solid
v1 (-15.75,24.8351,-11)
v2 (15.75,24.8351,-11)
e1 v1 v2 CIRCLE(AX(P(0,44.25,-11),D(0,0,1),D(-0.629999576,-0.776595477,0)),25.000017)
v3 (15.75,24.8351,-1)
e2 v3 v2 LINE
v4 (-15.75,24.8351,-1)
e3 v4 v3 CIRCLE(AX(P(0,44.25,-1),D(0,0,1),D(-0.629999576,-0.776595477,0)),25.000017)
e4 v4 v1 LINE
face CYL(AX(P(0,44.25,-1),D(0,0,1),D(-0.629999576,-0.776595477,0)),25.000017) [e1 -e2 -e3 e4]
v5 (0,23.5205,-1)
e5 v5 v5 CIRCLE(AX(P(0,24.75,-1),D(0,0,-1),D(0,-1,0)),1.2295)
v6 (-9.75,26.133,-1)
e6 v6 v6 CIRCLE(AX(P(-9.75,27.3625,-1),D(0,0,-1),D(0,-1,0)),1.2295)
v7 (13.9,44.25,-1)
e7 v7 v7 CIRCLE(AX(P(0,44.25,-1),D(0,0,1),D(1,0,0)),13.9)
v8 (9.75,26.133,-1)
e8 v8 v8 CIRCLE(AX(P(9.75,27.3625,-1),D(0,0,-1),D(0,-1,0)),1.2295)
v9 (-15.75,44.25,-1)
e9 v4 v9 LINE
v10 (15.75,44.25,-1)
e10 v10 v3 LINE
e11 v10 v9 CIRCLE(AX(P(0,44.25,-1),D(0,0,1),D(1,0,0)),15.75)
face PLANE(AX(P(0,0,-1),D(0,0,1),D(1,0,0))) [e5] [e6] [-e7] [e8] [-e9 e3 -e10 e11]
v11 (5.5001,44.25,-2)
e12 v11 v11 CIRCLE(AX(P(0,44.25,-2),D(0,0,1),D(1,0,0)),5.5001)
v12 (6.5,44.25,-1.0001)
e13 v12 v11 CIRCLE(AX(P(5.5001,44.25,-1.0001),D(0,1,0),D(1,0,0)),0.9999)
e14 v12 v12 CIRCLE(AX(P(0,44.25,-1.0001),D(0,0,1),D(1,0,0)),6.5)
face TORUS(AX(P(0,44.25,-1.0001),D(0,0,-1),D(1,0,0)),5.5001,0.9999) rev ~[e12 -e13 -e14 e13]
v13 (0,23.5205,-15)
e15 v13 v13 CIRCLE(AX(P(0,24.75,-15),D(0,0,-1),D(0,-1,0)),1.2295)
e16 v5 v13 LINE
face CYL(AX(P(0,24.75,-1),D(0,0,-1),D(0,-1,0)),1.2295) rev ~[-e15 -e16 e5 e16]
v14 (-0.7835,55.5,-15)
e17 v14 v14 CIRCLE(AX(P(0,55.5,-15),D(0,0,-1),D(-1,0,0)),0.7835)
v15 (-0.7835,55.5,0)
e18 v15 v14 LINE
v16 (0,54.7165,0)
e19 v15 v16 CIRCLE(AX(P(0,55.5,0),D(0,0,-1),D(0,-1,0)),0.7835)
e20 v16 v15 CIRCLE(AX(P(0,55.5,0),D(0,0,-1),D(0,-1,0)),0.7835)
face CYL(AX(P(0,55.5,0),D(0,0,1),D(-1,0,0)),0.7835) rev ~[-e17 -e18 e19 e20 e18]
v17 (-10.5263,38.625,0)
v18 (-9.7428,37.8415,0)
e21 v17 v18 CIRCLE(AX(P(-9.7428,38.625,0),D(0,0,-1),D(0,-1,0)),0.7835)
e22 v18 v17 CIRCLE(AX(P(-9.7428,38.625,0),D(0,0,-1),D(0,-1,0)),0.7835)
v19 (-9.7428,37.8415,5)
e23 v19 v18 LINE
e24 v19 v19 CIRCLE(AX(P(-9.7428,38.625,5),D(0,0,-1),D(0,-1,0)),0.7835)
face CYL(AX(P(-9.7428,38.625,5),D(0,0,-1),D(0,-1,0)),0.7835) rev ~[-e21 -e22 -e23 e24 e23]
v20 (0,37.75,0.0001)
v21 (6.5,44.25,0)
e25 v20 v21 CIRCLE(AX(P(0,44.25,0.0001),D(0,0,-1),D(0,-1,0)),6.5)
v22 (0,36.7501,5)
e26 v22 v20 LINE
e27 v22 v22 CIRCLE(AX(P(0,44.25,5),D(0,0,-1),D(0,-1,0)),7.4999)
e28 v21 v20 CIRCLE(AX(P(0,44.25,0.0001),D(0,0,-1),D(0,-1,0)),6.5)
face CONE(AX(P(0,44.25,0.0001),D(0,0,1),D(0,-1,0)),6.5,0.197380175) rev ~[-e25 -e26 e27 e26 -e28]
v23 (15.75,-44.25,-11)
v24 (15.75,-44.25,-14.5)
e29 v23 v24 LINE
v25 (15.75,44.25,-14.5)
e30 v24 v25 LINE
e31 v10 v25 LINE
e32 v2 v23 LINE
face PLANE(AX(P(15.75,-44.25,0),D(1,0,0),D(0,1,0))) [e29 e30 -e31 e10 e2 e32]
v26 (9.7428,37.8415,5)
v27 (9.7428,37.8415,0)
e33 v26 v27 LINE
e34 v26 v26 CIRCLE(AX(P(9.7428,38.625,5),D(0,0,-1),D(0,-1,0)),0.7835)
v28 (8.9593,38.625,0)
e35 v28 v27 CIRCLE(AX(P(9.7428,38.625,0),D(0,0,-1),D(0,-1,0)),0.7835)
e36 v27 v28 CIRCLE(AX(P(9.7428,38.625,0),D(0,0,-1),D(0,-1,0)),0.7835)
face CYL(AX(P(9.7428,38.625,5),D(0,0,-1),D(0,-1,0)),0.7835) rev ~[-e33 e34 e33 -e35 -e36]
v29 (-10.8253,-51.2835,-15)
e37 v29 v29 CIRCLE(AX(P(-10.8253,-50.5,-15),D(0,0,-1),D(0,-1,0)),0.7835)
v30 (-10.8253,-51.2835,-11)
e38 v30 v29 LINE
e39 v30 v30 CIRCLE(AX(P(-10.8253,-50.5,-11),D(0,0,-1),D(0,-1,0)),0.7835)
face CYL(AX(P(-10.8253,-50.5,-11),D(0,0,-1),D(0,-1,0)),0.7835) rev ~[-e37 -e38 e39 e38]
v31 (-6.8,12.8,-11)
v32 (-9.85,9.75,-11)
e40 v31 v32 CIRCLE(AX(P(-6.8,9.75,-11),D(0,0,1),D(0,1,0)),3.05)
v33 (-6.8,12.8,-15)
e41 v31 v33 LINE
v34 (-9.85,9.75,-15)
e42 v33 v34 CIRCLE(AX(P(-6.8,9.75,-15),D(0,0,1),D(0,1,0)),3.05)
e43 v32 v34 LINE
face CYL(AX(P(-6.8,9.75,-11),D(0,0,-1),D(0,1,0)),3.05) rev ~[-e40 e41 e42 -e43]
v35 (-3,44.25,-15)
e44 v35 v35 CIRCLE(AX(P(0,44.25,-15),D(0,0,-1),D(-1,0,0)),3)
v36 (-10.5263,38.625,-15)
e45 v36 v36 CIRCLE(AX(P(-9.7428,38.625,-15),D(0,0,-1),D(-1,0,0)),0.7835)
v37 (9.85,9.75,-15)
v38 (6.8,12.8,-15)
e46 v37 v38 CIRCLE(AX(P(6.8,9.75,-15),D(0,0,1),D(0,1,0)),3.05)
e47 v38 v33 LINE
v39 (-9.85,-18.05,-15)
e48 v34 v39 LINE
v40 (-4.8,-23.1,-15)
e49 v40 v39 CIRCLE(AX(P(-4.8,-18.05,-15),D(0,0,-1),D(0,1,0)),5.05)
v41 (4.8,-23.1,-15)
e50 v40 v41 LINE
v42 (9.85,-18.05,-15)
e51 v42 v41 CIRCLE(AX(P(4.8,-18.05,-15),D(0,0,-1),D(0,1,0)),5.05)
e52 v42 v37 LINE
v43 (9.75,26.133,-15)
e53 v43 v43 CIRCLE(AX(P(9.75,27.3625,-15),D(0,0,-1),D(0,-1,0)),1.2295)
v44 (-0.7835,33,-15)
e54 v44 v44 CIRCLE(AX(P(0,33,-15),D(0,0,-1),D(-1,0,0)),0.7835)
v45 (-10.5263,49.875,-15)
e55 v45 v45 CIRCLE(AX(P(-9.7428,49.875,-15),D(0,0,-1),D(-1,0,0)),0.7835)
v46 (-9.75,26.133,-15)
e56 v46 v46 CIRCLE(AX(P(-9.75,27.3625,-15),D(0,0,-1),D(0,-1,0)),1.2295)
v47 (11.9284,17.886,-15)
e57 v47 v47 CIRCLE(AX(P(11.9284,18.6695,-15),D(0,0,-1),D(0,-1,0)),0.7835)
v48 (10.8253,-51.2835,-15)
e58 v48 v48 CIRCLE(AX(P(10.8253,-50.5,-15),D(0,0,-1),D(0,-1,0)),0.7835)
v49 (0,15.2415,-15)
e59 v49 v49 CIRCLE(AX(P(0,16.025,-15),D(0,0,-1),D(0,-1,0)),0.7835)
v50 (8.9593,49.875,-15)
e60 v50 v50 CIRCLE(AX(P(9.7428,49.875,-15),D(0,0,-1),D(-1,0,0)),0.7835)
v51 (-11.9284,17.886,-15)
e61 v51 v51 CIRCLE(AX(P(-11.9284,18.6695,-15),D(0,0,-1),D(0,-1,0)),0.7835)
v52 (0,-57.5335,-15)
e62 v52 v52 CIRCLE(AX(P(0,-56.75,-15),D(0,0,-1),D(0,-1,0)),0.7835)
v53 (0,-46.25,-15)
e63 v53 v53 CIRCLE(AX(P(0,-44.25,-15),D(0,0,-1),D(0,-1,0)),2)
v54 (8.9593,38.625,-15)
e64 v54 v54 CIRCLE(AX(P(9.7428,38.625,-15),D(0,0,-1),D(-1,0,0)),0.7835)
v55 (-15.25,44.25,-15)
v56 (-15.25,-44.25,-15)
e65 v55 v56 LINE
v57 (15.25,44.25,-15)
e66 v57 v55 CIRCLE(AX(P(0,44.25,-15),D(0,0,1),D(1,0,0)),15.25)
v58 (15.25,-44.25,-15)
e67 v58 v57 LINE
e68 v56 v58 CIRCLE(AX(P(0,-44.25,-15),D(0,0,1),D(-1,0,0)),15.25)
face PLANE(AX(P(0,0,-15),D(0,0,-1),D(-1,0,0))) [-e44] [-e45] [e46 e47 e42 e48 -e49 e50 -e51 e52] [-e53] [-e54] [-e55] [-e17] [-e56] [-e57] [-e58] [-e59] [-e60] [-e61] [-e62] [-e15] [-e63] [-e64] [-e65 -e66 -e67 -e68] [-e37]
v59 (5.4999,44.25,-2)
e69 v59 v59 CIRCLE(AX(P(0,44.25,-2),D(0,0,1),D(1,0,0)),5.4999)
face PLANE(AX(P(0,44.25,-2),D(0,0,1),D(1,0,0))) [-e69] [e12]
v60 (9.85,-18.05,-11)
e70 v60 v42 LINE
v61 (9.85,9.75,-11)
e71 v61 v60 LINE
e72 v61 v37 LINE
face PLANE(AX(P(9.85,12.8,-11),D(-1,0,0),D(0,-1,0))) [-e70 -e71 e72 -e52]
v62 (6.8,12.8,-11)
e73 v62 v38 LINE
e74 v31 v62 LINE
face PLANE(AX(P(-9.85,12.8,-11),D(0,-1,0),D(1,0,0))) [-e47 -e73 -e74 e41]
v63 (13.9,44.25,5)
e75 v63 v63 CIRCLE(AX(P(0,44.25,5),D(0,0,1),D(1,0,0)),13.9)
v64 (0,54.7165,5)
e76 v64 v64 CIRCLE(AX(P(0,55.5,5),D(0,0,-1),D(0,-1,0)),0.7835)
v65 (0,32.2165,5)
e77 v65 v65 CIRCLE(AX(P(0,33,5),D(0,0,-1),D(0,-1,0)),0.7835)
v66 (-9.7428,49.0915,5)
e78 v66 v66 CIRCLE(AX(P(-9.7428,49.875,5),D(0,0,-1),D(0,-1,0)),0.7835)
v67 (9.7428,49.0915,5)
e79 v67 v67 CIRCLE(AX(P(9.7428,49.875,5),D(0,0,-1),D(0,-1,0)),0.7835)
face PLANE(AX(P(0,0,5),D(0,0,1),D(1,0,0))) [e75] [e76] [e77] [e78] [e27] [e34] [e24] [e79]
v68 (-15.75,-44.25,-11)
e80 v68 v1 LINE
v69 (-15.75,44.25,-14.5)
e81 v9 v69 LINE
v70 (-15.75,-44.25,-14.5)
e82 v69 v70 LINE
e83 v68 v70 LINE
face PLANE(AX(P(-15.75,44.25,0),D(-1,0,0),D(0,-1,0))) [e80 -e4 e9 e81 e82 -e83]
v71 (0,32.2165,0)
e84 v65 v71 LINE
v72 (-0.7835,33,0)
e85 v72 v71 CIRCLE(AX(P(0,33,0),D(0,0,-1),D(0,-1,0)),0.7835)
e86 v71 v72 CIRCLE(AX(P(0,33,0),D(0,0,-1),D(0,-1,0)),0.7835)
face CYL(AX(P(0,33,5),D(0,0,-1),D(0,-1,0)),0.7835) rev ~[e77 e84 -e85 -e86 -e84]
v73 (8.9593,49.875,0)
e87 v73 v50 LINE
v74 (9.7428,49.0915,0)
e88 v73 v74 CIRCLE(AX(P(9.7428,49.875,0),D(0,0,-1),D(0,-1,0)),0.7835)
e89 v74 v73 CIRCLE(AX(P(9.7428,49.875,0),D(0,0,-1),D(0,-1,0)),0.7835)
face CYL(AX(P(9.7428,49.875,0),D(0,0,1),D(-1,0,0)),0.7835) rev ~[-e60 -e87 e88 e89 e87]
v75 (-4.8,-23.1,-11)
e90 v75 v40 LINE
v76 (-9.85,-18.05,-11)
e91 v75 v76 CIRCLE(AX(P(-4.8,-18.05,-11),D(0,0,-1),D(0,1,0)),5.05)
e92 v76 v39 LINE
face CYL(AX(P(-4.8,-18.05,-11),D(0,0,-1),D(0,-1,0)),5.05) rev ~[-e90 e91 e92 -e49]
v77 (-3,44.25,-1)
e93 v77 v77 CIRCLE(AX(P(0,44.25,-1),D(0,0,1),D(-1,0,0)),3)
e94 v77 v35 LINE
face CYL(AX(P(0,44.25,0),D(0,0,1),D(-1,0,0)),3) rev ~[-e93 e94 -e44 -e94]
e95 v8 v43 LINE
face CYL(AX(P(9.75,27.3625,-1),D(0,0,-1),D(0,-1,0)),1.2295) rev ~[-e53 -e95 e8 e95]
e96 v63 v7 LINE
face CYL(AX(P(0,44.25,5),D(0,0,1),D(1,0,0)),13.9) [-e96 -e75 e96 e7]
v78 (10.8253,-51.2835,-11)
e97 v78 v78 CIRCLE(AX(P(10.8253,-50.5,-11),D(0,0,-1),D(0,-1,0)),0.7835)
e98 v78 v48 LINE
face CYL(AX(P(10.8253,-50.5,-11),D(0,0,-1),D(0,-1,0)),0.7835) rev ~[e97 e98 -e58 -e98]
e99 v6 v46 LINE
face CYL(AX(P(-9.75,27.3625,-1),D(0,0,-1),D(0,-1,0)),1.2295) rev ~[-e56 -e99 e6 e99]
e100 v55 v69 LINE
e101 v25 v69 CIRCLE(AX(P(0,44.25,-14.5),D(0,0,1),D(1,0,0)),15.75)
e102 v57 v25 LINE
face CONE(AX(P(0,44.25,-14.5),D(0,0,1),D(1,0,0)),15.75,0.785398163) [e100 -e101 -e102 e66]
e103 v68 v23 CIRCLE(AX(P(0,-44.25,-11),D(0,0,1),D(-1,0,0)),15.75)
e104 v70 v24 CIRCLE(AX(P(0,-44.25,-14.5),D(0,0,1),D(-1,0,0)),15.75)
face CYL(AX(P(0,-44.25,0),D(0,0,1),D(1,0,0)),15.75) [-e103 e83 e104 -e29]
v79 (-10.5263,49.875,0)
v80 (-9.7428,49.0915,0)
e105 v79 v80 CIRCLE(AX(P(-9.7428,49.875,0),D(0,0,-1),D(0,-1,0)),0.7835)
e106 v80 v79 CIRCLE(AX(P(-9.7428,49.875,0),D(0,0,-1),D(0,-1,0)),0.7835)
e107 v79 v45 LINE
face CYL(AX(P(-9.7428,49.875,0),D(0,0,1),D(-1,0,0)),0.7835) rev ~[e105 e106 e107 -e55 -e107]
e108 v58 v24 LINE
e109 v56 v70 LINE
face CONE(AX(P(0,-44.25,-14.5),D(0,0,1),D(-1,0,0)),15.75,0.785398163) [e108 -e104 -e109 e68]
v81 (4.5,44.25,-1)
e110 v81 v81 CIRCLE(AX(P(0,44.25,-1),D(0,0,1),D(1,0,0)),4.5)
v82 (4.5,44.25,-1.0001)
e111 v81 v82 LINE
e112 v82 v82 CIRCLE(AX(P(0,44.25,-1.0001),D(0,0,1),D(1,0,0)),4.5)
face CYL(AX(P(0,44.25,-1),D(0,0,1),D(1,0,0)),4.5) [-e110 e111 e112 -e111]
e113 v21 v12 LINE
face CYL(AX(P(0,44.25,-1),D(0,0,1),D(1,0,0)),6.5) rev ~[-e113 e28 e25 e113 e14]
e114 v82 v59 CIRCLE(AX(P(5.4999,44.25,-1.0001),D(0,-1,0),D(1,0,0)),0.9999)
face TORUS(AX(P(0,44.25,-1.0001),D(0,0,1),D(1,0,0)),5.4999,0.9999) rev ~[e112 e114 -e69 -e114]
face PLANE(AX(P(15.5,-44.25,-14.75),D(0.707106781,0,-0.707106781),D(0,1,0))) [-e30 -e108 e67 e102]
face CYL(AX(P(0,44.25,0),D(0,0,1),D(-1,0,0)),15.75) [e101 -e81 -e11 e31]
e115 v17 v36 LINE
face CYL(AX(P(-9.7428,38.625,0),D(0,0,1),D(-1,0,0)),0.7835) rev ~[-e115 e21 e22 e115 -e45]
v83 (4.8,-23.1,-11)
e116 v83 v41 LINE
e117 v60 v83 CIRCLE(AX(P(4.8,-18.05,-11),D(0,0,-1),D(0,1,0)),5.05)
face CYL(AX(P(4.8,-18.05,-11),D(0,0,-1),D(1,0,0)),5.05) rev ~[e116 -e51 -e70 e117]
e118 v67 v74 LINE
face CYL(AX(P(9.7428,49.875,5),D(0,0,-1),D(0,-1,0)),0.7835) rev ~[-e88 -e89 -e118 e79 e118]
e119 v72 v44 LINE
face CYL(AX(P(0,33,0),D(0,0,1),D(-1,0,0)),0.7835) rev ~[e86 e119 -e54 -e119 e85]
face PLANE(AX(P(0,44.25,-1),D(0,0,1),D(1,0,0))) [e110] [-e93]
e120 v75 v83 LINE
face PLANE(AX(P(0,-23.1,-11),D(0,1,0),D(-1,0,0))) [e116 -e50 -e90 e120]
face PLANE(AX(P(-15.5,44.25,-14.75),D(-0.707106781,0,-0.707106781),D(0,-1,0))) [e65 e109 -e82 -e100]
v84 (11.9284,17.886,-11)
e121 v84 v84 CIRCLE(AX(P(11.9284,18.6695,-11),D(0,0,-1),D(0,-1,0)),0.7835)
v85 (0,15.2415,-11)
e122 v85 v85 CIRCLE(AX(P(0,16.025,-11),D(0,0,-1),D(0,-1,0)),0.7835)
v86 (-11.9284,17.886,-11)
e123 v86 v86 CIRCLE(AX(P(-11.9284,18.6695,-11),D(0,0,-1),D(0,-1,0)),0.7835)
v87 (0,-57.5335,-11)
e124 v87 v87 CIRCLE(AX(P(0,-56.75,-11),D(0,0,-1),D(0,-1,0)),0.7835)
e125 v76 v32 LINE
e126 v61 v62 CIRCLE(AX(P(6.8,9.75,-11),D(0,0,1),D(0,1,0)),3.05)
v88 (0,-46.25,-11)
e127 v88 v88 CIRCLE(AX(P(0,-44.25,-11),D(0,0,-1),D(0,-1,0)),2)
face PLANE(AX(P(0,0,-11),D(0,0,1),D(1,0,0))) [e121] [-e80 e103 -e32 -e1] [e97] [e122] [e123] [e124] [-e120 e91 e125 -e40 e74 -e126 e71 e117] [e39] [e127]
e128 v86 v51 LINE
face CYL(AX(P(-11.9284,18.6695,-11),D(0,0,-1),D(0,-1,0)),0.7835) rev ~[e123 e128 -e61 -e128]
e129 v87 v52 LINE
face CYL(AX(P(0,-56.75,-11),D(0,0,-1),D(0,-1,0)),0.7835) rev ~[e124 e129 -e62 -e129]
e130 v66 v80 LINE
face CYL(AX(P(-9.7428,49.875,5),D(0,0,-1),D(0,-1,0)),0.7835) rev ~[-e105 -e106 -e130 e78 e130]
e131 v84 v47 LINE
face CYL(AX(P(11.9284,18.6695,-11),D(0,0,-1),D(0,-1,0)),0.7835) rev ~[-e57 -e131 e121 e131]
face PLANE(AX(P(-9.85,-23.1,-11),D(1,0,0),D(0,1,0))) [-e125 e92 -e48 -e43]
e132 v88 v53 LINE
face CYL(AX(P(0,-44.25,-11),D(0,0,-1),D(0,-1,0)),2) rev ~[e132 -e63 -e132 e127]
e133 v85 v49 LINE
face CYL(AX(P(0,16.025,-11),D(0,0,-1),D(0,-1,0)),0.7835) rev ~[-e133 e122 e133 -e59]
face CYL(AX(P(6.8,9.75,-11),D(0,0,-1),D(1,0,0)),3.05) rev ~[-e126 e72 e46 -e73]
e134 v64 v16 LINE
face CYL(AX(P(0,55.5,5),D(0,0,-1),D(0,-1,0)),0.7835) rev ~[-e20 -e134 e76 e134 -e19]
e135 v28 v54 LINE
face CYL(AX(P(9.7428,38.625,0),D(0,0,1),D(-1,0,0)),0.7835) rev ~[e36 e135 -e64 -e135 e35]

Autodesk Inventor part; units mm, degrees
ref_plane "YZ Plane" through (0, 0, 0) normal (1, 0, 0) x (0, 1, 0)
ref_plane "XZ Plane" through (0, 0, 0) normal (0, 1, 0) x (-1, 0, 0)
ref_plane "XY Plane" through (0, 0, 0) normal (0, 0, 1) x (1, 0, 0)
sketch "スケッチ1" plane through (0, 0, 0) normal (0, 0, 1) x (1, 0, 0)
  line L0 (-15.75, -60) -> (15.75, -60)
  line L1 (15.75, -60) -> (15.75, 60)
  line L2 (15.75, 60) -> (-15.75, 60)
  line L3 (-15.75, 60) -> (-15.75, -60)
  point P0 (0, 0)
  dimension "d0" = 31.5
  dimension "d1" = 15.75
  dimension "d2" = 120
  dimension "d3" = 60
extrude "押し出し1" add sketch "スケッチ1" along normal blind 5
fillet "フィレット1" radius 15.75 4 edges at (-15.75, 60, 2.5) (15.75, 60, 2.5) (15.75, -60, 2.5) (-15.75, -60, 2.5)
sketch "スケッチ2" plane through (0, 0, 5) normal (0, 0, 1) x (1, 0, 0)
  arc A0 (15.75, 44.25) -> (-15.75, 44.25) centre (0, 44.25) ccw projected
  circle A1 centre (0, 44.25) radius 11.25
  point P0 (0, 0)
  point P1 (0, 55.5)
  point P2 (9.7428, 49.875)
  point P3 (9.7428, 38.625)
  point P4 (0, 33)
  point P5 (-9.7428, 38.625)
  point P6 (-9.7428, 49.875)
  dimension "d7" = 22.5
  dimension "d10" = 360
hole "Hole1" at (0, 55.5, 5) at (9.7428, 49.875, 5) at (9.7428, 38.625, 5) at (0, 33, 5) at (-9.7428, 38.625, 5) at (-9.7428, 49.875, 5) direction (0, 0, -1) diameter 1.567 depth 8 tip angle 118 thread size "M2x0.4" class "6H" standard "ISO Metric profile"
sketch "スケッチ3" plane through (0, 0, 5) normal (0, 0, 1) x (1, 0, 0)
  arc A0 (15.75, 44.25) -> (-15.75, 44.25) centre (0, 44.25) ccw projected
  point P0 (0, 0)
hole "Hole2" at (0, 44.25, 5) direction (0, 0, -1) diameter 13 end through all
chamfer "面取り1" distance 1 distance2 5 1 edges at (0, 50.75, 5) measured on face at (0, -18.7612, 5)
sketch "スケッチ5" plane through (0, 0, 0) normal (0, 0, -1) x (-1, 0, 0)
  circle A0 centre (9.7428, 49.875) radius 0.7835 projected
  circle A1 centre (9.7428, 38.625) radius 0.7835 projected
  circle A2 centre (0, 33) radius 0.7835 projected
  circle A3 centre (-9.7428, 38.625) radius 0.7835 projected
  circle A4 centre (-9.7428, 49.875) radius 0.7835 projected
  circle A5 centre (0, 55.5) radius 0.7835 projected
  arc A6 (-15.75, -44.25) -> (15.75, -44.25) centre (0, -44.25) ccw projected
  line L0 (15.75, 44.25) -> (15.75, -44.25) projected
  arc A7 (15.75, 44.25) -> (-15.75, 44.25) centre (0, 44.25) ccw projected
  line L1 (-15.75, -44.25) -> (-15.75, 44.25) projected
  circle A8 centre (0, 44.25) radius 3
  point P0 (0, 0)
  dimension "d31" = 6
extrude "押し出し3" add sketch "スケッチ5" along normal blind 15
sketch "スケッチ6" plane through (0, 44.25, 0) normal (0, 0, 1) x (1, 0, 0)
  circle A0 centre (0, 0) radius 3 projected
  circle A1 centre (0, 0) radius 6.5 projected
  point P0 (0, -44.25)
extrude "押し出し4" cut sketch "スケッチ6" against normal blind 1
sketch "スケッチ7" plane through (0, 44.25, -1) normal (0, 0, 1) x (1, 0, 0)
  circle A0 centre (0, 0) radius 6.5 projected
  circle A1 centre (0, 0) radius 4.5
  point P0 (0, -44.25)
  dimension "d36" = 9
extrude "押し出し5" cut sketch "スケッチ7" against normal blind 1
fillet "フィレット2" radius 1 2 edges at (-6.5, 44.25, -2) (-4.5, 44.25, -2)
sketch "スケッチ9" plane through (0, 0, 5) normal (0, 0, 1) x (1, 0, 0)
  arc A0 (-15.75, -44.25) -> (15.75, -44.25) centre (0, -44.25) ccw projected
  line L0 (15.75, 44.25) -> (15.75, -44.25) projected
  arc A1 (15.75, 44.25) -> (-15.75, 44.25) centre (0, 44.25) ccw projected
  line L1 (-15.75, -44.25) -> (-15.75, 44.25) projected
  circle A2 centre (0, 44.25) radius 7.5 projected
  circle A3 centre (0, 44.25) radius 13.9
  point P0 (0, 0)
  dimension "d46" = 27.8
extrude "押し出し7" cut sketch "スケッチ9" against normal blind 6 contours L1 A1 L0 A0
sketch "スケッチ10" plane through (0, 0, -1) normal (0, 0, 1) x (1, 0, 0)
  line L0 (15.75, 44.25) -> (15.75, -44.25) projected
  arc A0 (15.75, 44.25) -> (-15.75, 44.25) centre (0, 44.25) ccw projected
  line L1 (-15.75, -44.25) -> (-15.75, 44.25) projected
  arc A1 (-15.75, -44.25) -> (15.75, -44.25) centre (0, -44.25) ccw projected
  arc A2 (15.75, 24.8351) -> (-15.75, 24.8351) centre (0, 44.25) ccw
  arc A3 (-15.75, 24.8351) -> (15.75, 24.8351) centre (0, 44.25) ccw
  point P0 (0, 0)
  dimension "d49" = 50
extrude "押し出し8" cut sketch "スケッチ10" against normal blind 10 contours L0 A1 L1 A3
sketch "スケッチ11" plane through (0, 0, -11) normal (0, 0, 1) x (1, 0, 0)
  arc A0 (-15.75, -44.25) -> (15.75, -44.25) centre (0, -44.25) ccw projected
  point P0 (0, 0)
hole "Hole3" at (0, -44.25, -11) direction (0, 0, -1) diameter 4 end through all
sketch "スケッチ12" plane through (0, 0, -1) normal (0, 0, 1) x (1, 0, 0)
  line L0 (-15.75, 24.8351) -> (-15.75, 44.25) projected
  circle A0 centre (0, 44.25) radius 13.9 projected
  circle A1 centre (0, 44.25) radius 19.5
  line L1 (0, 44.25) -> (0, 63.75)
  line L2 (0, 44.25) -> (-9.75, 27.3625)
  line L3 (0, 44.25) -> (9.75, 27.3625)
  line L4 (15.75, 44.25) -> (15.75, 24.8351) projected
  arc A2 (15.75, 44.25) -> (-15.75, 44.25) centre (0, 44.25) ccw projected
  line L5 (0, 44.25) -> (0, 24.75)
  point P0 (0, 0)
  dimension "d59" = 39
  dimension "d60" = 150
  dimension "d61" = 150
hole "Hole4" at (-9.75, 27.3625, -1) at (9.75, 27.3625, -1) at (0, 24.75, -1) direction (0, 0, -1) diameter 2.459 end through all thread size "M3x0.5" class "6H" standard "ISO Metric profile"
sketch "スケッチ14" plane through (0, 0, -11) normal (0, 0, 1) x (1, 0, 0)
  circle A0 centre (0, -44.25) radius 2 projected
  arc A1 (-15.75, 24.8351) -> (15.75, 24.8351) centre (0, 44.25) ccw projected
  arc A2 (-15.75, -44.25) -> (15.75, -44.25) centre (0, -44.25) ccw projected
  line L0 (-9.85, 12.8) -> (9.85, 12.8)
  line L1 (9.85, 12.8) -> (9.85, -23.1)
  line L2 (9.85, -23.1) -> (-9.85, -23.1)
  line L3 (-9.85, -23.1) -> (-9.85, 12.8)
  line L4 (0, 19.25) -> (0, -60)
  point P0 (0, 0)
  dimension "d77" = 19.7
  dimension "d78" = 19.7
  dimension "d79" = 35.9
  dimension "d80" = 21.15
extrude "押し出し9" cut sketch "スケッチ14" against normal through all contours L0 L4 L2 L3 | L0 L1 L2 L4
fillet "フィレット3" radius 5.05 2 edges at (-9.85, -23.1, -13) (9.85, -23.1, -13)
fillet "フィレット4" radius 3.05 2 edges at (-9.85, 12.8, -13) (9.85, 12.8, -13)
sketch "スケッチ15" plane through (0, 0, -11) normal (0, 0, 1) x (1, 0, 0)
  line L0 (-6.8, 12.8) -> (6.8, 12.8) projected
  circle A0 centre (0, -44.25) radius 2 projected
  line L1 (15.75, 24.8351) -> (15.75, -44.25) projected
  circle A1 centre (0, 44.25) radius 31.45
  line L2 (0, 19.25) -> (0, 12.8)
  circle A2 centre (0, 44.25) radius 28.225
  line L3 (0, 44.25) -> (0, 12.8)
  line L4 (0, 44.25) -> (-11.9284, 18.6695)
  line L5 (0, 44.25) -> (11.9284, 18.6695)
  circle A3 centre (0, -44.25) radius 12.5
  line L6 (0, -44.25) -> (0, -56.75)
  line L7 (0, -44.25) -> (10.8253, -50.5)
  line L8 (0, -44.25) -> (-10.8253, -50.5)
  point P0 (0, 0)
  point P1 (0, 16.025)
  point P2 (10.8253, -50.5)
  dimension "d86" = 25
  dimension "d87" = 25
  dimension "d88" = 25
  dimension "d93" = 120
  dimension "d94" = 60
  dimension "d95" = 180
  dimension "d96" = 0
  dimension "d97" = 0
hole "Hole6" at (0, -44.25, -11) at (-11.9284, 18.6695, -11) at (0, 16.025, -11) at (11.9284, 18.6695, -11) at (10.8253, -50.5, -11) at (0, -56.75, -11) at (-10.8253, -50.5, -11) direction (0, 0, -1) diameter 1.567 depth 8 tip angle 118 thread size "M2x0.4" class "6H" standard "ISO Metric profile"
chamfer "面取り2" distance 0.5 angle 45 4 edges at (-15.75, 0, -15) (0, -60, -15) (15.75, 0, -15) (0, 60, -15)
equation "\"d1\" = 0.5 * d0"
equation "\"d3\" = 0.5 * d2"
equation "\"d60\" = d61"
equation "\"d78\" = d77"
equation "\"d94\" = 0.5 * d93"
properties part number "JointC2_2nd" material "ポリプロピレン"
